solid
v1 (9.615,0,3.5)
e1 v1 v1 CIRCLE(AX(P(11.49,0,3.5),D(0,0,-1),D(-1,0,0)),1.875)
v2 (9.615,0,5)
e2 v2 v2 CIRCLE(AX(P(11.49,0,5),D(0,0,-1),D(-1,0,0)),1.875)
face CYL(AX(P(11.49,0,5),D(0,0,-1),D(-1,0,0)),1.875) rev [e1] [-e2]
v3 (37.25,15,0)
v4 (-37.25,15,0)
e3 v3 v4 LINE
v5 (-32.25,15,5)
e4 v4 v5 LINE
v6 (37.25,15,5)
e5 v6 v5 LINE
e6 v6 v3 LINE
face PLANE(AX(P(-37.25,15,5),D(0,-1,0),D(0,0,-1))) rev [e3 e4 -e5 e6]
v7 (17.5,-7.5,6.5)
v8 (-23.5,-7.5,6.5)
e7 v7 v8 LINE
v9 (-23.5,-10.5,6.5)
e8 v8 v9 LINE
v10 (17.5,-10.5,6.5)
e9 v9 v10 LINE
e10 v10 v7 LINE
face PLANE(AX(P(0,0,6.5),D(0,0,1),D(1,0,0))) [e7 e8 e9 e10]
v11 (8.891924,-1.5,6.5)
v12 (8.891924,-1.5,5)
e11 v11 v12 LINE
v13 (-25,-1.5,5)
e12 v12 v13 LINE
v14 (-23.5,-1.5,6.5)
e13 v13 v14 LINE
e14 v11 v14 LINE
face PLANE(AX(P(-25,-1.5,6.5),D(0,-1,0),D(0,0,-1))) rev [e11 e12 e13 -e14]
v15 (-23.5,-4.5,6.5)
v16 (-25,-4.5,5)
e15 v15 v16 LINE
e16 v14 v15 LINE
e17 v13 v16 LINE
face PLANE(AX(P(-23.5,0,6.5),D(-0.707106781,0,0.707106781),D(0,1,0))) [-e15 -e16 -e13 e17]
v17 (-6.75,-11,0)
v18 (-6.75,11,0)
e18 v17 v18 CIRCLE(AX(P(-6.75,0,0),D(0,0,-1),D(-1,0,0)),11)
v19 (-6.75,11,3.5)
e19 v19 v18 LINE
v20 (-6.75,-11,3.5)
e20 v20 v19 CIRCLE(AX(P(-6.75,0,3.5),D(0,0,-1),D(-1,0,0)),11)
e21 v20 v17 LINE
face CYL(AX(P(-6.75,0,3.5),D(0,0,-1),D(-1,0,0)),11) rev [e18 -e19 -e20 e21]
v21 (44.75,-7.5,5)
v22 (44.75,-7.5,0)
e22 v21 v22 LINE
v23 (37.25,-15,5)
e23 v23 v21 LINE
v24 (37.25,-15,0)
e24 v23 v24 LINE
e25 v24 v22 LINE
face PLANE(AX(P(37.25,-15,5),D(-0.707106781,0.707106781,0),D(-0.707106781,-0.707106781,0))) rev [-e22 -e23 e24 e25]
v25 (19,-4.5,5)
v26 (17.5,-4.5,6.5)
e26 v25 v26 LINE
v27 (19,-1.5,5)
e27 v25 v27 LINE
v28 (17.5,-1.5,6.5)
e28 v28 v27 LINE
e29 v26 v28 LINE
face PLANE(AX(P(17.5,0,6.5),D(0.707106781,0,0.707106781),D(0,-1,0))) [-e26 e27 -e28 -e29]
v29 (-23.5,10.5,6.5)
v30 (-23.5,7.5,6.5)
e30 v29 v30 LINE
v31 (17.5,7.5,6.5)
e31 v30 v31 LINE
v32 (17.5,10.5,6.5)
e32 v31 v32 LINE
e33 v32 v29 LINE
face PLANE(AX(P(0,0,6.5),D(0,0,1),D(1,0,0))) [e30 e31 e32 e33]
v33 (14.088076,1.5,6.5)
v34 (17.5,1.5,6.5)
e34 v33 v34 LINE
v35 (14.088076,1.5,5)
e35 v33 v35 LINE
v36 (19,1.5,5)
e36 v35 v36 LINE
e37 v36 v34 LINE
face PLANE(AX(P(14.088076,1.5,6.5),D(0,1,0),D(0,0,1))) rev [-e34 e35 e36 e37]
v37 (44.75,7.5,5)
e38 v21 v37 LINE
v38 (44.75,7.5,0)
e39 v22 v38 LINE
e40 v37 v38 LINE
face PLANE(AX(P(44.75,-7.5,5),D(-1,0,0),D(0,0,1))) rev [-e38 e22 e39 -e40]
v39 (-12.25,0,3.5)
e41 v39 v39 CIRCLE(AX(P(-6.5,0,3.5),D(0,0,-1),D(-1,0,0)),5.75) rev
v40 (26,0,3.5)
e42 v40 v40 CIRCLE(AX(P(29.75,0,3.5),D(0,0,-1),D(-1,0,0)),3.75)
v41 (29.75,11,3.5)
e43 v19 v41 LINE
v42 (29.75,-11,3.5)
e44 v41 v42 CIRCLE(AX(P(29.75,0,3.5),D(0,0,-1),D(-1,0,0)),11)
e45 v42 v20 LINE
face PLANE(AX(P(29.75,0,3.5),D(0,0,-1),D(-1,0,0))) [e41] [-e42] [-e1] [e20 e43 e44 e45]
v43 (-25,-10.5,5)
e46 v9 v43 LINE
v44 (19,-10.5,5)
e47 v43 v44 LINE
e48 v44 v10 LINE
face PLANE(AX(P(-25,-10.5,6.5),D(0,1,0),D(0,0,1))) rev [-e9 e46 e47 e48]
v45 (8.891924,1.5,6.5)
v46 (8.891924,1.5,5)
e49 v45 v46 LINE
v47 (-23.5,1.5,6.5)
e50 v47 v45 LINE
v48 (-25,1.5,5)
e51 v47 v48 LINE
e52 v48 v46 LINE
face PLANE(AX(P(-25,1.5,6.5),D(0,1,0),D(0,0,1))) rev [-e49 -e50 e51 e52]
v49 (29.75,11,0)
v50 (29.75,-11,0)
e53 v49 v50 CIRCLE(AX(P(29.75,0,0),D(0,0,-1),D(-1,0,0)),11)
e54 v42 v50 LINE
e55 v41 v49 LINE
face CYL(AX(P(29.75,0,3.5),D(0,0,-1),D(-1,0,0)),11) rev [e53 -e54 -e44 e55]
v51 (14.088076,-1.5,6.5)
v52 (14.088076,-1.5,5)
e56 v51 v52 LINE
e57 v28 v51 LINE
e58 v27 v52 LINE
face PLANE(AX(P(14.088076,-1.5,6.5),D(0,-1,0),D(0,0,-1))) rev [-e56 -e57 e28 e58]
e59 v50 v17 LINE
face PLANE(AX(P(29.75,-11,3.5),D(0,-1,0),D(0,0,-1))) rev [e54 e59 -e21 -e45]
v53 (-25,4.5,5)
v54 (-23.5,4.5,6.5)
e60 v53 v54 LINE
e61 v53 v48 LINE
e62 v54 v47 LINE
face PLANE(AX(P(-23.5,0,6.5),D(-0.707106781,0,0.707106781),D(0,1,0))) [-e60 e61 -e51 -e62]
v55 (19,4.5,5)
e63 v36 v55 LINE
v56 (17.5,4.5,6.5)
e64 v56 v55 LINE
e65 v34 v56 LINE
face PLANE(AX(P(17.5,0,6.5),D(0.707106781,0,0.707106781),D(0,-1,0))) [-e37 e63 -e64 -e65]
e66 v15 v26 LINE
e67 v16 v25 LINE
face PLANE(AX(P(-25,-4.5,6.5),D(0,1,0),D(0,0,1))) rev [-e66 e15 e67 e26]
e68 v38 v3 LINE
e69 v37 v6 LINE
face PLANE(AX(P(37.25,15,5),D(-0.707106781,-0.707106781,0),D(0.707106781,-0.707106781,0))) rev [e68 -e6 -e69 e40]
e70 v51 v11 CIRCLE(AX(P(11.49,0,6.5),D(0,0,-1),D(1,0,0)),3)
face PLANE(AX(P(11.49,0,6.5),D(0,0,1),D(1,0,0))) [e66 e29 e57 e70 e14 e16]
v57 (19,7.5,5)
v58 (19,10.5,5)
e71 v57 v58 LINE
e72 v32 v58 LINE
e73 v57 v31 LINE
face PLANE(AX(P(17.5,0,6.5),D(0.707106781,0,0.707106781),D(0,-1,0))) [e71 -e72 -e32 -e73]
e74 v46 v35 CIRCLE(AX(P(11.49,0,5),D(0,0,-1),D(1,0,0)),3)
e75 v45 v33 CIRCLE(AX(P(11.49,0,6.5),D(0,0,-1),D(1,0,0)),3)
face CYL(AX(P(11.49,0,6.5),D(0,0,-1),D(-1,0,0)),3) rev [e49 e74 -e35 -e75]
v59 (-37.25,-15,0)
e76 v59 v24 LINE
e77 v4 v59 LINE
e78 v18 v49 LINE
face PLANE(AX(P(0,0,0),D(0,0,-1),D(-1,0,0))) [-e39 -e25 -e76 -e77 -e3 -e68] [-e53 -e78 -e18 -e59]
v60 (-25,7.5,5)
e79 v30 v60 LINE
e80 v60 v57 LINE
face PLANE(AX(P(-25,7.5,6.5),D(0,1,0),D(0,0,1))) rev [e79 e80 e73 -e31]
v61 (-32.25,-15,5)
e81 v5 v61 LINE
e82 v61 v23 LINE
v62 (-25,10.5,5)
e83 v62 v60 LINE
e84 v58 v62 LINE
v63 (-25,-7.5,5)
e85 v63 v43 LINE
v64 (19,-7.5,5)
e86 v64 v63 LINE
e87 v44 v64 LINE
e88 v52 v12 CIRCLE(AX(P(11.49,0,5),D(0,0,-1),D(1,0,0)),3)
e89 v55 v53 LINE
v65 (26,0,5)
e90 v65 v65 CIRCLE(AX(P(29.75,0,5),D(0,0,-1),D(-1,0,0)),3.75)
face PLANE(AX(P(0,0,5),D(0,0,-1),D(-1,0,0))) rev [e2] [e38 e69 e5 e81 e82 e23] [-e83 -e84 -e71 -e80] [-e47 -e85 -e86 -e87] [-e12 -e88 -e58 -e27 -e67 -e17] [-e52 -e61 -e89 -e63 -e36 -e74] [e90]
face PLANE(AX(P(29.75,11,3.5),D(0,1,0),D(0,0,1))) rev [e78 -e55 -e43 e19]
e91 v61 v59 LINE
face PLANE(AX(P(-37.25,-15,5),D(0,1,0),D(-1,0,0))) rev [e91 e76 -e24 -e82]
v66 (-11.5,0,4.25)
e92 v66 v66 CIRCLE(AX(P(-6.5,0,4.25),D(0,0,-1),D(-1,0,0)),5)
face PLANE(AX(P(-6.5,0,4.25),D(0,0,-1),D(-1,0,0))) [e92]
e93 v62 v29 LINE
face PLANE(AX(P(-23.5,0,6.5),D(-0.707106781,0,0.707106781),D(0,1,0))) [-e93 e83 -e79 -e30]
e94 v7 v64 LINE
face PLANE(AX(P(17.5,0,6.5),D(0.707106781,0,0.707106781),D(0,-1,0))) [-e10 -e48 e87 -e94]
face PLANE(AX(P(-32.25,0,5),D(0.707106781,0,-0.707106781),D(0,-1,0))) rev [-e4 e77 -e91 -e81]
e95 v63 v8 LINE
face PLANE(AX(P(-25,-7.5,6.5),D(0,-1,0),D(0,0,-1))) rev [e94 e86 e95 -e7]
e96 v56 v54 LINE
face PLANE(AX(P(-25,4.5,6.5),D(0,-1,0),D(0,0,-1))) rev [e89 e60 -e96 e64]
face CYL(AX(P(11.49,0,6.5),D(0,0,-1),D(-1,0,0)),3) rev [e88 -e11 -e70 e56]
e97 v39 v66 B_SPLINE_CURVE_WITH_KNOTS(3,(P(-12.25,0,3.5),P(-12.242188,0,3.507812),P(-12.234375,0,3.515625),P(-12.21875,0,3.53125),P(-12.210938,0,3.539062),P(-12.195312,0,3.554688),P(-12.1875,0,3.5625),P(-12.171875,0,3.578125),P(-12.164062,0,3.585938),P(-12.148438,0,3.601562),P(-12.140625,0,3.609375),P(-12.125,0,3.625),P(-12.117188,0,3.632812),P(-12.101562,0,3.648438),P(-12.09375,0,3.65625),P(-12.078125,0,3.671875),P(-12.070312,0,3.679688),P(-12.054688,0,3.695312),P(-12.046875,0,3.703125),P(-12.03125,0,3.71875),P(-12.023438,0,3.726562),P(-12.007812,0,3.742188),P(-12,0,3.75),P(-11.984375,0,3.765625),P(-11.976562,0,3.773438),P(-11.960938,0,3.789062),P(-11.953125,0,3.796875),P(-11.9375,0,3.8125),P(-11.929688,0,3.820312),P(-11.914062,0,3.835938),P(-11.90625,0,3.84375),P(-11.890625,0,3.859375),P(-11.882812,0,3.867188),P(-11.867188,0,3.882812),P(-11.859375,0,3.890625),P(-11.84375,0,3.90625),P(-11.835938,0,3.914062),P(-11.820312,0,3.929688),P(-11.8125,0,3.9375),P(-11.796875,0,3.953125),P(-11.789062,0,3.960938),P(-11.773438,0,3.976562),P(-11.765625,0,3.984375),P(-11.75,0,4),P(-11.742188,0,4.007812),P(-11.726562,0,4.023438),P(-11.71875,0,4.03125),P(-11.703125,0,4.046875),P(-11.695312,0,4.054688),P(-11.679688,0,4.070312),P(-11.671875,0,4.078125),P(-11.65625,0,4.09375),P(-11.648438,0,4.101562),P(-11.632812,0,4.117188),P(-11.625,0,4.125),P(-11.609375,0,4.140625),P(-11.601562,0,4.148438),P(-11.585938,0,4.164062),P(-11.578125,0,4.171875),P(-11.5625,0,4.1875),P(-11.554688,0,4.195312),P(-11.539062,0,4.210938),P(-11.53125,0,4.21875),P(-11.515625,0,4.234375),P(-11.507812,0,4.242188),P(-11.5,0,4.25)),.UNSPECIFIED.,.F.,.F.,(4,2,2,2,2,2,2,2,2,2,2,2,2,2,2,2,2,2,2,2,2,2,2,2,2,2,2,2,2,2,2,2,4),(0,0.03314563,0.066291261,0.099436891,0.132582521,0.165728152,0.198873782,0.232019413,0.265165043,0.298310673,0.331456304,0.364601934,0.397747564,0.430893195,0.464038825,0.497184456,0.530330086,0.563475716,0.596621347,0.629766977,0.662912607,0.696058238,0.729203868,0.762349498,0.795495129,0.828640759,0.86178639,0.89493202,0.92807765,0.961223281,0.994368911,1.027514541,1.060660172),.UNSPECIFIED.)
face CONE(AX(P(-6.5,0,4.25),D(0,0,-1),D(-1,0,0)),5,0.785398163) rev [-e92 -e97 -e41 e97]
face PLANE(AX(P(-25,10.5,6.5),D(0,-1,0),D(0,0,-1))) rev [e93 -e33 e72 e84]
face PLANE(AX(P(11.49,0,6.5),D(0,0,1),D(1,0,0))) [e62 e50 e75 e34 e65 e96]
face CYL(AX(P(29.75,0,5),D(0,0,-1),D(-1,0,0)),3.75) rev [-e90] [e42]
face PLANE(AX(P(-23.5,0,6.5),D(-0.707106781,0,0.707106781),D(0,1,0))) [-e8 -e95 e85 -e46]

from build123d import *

# Parameters (mm, degrees)
BOSS_EXTRUDE1_DEPTH = 5
CHAMFER1_SIZE       = 5
CUT_EXTRUDE1_DEPTH  = 3.5
SKETCH3_R           = 5
CUT_EXTRUDE2_DEPTH  = 0.75
CHAMFER2_SIZE       = 0.75
SKETCH4_R           = 1.875
SKETCH4_R_2         = 3.75
CUT_EXTRUDE3_DEPTH  = 48.326657393
SKETCH5_W           = 44
SKETCH5_H           = 3
BOSS_EXTRUDE2_DEPTH = 1.5
CHAMFER3_SIZE       = 1.5


with BuildPart() as part:
    # Sketch1 → Boss-Extrude1 (new body)
    with BuildSketch(Plane.XY):
        Polygon((37.25, 15), (44.75, 7.5), (44.75, -7.5), (37.25, -15), (-37.25, -15), (-37.25, 15), align=None)
    extrude(amount=BOSS_EXTRUDE1_DEPTH)

    # Chamfer1
    chamfer1_edges = [part.edges().sort_by_distance(p)[0] for p in [
        (-37.25, 0, 5),
    ]]
    chamfer(chamfer1_edges, length=CHAMFER1_SIZE - 0.0001)  # a hair under: the kernel refuses the full size

    # Sketch2 → Cut-Extrude1 (cut)
    with BuildSketch(Plane(origin=(0, 0, 0), x_dir=(-1, 0, 0), z_dir=(0, 0, -1))):
        with BuildLine():
            Line((-29.75, -11), (6.75, -11))
            ThreePointArc((6.75, -11), (17.75, 0), (6.75, 11))
            Line((6.75, 11), (-29.75, 11))
            ThreePointArc((-29.75, 11), (-40.75, 0), (-29.75, -11))
        make_face()
    extrude(amount=-CUT_EXTRUDE1_DEPTH, mode=Mode.SUBTRACT)

    # Sketch3 → Cut-Extrude2 (cut)
    with BuildSketch(Plane(origin=(0, 0, 3.5), x_dir=(-1, 0, 0), z_dir=(0, 0, -1))):
        with Locations((6.5, 0)):
            Circle(SKETCH3_R)
    extrude(amount=-CUT_EXTRUDE2_DEPTH, mode=Mode.SUBTRACT)

    # Chamfer2
    chamfer2_edges = [part.edges().sort_by_distance(p)[0] for p in [
        (-1.5, 0, 3.5),
    ]]
    chamfer(chamfer2_edges, length=CHAMFER2_SIZE - 0.0001)  # a hair under: the kernel refuses the full size

    # Sketch4 → Cut-Extrude3 (cut, through all)
    with BuildSketch(Plane(origin=(0, 0, 3.5), x_dir=(-1, 0, 0), z_dir=(0, 0, -1))):
        with Locations((-11.49, 0)):
            Circle(SKETCH4_R)
        with Locations((-29.75, 0)):
            Circle(SKETCH4_R_2)
    extrude(amount=-CUT_EXTRUDE3_DEPTH, mode=Mode.SUBTRACT)

    # Sketch5 → Boss-Extrude2 (add)
    with BuildSketch(Plane.XY.offset(5)):
        with Locations((-3, 9)):
            Rectangle(SKETCH5_W, SKETCH5_H)
        with BuildLine():
            Line((-25, 4.5), (19, 4.5))
            Line((19, 4.5), (19, 1.5))
            Line((19, 1.5), (14.088076211, 1.5))
            ThreePointArc((14.088076211, 1.5), (11.49, 3), (8.891923789, 1.5))
            Line((8.891923789, 1.5), (-25, 1.5))
            Line((-25, 1.5), (-25, 4.5))
        make_face()
        with Locations((-3, -9)):
            Rectangle(SKETCH5_W, SKETCH5_H)
        with BuildLine():
            Line((-25, -1.5), (8.891923789, -1.5))
            ThreePointArc((8.891923789, -1.5), (11.49, -3), (14.088076211, -1.5))
            Line((14.088076211, -1.5), (19, -1.5))
            Line((19, -1.5), (19, -4.5))
            Line((19, -4.5), (-25, -4.5))
            Line((-25, -4.5), (-25, -1.5))
        make_face()
    extrude(amount=BOSS_EXTRUDE2_DEPTH)

    # Chamfer3
    chamfer3_edges = [part.edges().sort_by_distance(p)[0] for p in [
        (-25, 9, 6.5),
        (-25, 3, 6.5),
        (-25, -3, 6.5),
        (-25, -9, 6.5),
        (19, -9, 6.5),
        (19, -3, 6.5),
        (19, 3, 6.5),
        (19, 9, 6.5),
    ]]
    chamfer(chamfer3_edges, length=CHAMFER3_SIZE - 0.0001)  # a hair under: the kernel refuses the full size


solid = part.part
